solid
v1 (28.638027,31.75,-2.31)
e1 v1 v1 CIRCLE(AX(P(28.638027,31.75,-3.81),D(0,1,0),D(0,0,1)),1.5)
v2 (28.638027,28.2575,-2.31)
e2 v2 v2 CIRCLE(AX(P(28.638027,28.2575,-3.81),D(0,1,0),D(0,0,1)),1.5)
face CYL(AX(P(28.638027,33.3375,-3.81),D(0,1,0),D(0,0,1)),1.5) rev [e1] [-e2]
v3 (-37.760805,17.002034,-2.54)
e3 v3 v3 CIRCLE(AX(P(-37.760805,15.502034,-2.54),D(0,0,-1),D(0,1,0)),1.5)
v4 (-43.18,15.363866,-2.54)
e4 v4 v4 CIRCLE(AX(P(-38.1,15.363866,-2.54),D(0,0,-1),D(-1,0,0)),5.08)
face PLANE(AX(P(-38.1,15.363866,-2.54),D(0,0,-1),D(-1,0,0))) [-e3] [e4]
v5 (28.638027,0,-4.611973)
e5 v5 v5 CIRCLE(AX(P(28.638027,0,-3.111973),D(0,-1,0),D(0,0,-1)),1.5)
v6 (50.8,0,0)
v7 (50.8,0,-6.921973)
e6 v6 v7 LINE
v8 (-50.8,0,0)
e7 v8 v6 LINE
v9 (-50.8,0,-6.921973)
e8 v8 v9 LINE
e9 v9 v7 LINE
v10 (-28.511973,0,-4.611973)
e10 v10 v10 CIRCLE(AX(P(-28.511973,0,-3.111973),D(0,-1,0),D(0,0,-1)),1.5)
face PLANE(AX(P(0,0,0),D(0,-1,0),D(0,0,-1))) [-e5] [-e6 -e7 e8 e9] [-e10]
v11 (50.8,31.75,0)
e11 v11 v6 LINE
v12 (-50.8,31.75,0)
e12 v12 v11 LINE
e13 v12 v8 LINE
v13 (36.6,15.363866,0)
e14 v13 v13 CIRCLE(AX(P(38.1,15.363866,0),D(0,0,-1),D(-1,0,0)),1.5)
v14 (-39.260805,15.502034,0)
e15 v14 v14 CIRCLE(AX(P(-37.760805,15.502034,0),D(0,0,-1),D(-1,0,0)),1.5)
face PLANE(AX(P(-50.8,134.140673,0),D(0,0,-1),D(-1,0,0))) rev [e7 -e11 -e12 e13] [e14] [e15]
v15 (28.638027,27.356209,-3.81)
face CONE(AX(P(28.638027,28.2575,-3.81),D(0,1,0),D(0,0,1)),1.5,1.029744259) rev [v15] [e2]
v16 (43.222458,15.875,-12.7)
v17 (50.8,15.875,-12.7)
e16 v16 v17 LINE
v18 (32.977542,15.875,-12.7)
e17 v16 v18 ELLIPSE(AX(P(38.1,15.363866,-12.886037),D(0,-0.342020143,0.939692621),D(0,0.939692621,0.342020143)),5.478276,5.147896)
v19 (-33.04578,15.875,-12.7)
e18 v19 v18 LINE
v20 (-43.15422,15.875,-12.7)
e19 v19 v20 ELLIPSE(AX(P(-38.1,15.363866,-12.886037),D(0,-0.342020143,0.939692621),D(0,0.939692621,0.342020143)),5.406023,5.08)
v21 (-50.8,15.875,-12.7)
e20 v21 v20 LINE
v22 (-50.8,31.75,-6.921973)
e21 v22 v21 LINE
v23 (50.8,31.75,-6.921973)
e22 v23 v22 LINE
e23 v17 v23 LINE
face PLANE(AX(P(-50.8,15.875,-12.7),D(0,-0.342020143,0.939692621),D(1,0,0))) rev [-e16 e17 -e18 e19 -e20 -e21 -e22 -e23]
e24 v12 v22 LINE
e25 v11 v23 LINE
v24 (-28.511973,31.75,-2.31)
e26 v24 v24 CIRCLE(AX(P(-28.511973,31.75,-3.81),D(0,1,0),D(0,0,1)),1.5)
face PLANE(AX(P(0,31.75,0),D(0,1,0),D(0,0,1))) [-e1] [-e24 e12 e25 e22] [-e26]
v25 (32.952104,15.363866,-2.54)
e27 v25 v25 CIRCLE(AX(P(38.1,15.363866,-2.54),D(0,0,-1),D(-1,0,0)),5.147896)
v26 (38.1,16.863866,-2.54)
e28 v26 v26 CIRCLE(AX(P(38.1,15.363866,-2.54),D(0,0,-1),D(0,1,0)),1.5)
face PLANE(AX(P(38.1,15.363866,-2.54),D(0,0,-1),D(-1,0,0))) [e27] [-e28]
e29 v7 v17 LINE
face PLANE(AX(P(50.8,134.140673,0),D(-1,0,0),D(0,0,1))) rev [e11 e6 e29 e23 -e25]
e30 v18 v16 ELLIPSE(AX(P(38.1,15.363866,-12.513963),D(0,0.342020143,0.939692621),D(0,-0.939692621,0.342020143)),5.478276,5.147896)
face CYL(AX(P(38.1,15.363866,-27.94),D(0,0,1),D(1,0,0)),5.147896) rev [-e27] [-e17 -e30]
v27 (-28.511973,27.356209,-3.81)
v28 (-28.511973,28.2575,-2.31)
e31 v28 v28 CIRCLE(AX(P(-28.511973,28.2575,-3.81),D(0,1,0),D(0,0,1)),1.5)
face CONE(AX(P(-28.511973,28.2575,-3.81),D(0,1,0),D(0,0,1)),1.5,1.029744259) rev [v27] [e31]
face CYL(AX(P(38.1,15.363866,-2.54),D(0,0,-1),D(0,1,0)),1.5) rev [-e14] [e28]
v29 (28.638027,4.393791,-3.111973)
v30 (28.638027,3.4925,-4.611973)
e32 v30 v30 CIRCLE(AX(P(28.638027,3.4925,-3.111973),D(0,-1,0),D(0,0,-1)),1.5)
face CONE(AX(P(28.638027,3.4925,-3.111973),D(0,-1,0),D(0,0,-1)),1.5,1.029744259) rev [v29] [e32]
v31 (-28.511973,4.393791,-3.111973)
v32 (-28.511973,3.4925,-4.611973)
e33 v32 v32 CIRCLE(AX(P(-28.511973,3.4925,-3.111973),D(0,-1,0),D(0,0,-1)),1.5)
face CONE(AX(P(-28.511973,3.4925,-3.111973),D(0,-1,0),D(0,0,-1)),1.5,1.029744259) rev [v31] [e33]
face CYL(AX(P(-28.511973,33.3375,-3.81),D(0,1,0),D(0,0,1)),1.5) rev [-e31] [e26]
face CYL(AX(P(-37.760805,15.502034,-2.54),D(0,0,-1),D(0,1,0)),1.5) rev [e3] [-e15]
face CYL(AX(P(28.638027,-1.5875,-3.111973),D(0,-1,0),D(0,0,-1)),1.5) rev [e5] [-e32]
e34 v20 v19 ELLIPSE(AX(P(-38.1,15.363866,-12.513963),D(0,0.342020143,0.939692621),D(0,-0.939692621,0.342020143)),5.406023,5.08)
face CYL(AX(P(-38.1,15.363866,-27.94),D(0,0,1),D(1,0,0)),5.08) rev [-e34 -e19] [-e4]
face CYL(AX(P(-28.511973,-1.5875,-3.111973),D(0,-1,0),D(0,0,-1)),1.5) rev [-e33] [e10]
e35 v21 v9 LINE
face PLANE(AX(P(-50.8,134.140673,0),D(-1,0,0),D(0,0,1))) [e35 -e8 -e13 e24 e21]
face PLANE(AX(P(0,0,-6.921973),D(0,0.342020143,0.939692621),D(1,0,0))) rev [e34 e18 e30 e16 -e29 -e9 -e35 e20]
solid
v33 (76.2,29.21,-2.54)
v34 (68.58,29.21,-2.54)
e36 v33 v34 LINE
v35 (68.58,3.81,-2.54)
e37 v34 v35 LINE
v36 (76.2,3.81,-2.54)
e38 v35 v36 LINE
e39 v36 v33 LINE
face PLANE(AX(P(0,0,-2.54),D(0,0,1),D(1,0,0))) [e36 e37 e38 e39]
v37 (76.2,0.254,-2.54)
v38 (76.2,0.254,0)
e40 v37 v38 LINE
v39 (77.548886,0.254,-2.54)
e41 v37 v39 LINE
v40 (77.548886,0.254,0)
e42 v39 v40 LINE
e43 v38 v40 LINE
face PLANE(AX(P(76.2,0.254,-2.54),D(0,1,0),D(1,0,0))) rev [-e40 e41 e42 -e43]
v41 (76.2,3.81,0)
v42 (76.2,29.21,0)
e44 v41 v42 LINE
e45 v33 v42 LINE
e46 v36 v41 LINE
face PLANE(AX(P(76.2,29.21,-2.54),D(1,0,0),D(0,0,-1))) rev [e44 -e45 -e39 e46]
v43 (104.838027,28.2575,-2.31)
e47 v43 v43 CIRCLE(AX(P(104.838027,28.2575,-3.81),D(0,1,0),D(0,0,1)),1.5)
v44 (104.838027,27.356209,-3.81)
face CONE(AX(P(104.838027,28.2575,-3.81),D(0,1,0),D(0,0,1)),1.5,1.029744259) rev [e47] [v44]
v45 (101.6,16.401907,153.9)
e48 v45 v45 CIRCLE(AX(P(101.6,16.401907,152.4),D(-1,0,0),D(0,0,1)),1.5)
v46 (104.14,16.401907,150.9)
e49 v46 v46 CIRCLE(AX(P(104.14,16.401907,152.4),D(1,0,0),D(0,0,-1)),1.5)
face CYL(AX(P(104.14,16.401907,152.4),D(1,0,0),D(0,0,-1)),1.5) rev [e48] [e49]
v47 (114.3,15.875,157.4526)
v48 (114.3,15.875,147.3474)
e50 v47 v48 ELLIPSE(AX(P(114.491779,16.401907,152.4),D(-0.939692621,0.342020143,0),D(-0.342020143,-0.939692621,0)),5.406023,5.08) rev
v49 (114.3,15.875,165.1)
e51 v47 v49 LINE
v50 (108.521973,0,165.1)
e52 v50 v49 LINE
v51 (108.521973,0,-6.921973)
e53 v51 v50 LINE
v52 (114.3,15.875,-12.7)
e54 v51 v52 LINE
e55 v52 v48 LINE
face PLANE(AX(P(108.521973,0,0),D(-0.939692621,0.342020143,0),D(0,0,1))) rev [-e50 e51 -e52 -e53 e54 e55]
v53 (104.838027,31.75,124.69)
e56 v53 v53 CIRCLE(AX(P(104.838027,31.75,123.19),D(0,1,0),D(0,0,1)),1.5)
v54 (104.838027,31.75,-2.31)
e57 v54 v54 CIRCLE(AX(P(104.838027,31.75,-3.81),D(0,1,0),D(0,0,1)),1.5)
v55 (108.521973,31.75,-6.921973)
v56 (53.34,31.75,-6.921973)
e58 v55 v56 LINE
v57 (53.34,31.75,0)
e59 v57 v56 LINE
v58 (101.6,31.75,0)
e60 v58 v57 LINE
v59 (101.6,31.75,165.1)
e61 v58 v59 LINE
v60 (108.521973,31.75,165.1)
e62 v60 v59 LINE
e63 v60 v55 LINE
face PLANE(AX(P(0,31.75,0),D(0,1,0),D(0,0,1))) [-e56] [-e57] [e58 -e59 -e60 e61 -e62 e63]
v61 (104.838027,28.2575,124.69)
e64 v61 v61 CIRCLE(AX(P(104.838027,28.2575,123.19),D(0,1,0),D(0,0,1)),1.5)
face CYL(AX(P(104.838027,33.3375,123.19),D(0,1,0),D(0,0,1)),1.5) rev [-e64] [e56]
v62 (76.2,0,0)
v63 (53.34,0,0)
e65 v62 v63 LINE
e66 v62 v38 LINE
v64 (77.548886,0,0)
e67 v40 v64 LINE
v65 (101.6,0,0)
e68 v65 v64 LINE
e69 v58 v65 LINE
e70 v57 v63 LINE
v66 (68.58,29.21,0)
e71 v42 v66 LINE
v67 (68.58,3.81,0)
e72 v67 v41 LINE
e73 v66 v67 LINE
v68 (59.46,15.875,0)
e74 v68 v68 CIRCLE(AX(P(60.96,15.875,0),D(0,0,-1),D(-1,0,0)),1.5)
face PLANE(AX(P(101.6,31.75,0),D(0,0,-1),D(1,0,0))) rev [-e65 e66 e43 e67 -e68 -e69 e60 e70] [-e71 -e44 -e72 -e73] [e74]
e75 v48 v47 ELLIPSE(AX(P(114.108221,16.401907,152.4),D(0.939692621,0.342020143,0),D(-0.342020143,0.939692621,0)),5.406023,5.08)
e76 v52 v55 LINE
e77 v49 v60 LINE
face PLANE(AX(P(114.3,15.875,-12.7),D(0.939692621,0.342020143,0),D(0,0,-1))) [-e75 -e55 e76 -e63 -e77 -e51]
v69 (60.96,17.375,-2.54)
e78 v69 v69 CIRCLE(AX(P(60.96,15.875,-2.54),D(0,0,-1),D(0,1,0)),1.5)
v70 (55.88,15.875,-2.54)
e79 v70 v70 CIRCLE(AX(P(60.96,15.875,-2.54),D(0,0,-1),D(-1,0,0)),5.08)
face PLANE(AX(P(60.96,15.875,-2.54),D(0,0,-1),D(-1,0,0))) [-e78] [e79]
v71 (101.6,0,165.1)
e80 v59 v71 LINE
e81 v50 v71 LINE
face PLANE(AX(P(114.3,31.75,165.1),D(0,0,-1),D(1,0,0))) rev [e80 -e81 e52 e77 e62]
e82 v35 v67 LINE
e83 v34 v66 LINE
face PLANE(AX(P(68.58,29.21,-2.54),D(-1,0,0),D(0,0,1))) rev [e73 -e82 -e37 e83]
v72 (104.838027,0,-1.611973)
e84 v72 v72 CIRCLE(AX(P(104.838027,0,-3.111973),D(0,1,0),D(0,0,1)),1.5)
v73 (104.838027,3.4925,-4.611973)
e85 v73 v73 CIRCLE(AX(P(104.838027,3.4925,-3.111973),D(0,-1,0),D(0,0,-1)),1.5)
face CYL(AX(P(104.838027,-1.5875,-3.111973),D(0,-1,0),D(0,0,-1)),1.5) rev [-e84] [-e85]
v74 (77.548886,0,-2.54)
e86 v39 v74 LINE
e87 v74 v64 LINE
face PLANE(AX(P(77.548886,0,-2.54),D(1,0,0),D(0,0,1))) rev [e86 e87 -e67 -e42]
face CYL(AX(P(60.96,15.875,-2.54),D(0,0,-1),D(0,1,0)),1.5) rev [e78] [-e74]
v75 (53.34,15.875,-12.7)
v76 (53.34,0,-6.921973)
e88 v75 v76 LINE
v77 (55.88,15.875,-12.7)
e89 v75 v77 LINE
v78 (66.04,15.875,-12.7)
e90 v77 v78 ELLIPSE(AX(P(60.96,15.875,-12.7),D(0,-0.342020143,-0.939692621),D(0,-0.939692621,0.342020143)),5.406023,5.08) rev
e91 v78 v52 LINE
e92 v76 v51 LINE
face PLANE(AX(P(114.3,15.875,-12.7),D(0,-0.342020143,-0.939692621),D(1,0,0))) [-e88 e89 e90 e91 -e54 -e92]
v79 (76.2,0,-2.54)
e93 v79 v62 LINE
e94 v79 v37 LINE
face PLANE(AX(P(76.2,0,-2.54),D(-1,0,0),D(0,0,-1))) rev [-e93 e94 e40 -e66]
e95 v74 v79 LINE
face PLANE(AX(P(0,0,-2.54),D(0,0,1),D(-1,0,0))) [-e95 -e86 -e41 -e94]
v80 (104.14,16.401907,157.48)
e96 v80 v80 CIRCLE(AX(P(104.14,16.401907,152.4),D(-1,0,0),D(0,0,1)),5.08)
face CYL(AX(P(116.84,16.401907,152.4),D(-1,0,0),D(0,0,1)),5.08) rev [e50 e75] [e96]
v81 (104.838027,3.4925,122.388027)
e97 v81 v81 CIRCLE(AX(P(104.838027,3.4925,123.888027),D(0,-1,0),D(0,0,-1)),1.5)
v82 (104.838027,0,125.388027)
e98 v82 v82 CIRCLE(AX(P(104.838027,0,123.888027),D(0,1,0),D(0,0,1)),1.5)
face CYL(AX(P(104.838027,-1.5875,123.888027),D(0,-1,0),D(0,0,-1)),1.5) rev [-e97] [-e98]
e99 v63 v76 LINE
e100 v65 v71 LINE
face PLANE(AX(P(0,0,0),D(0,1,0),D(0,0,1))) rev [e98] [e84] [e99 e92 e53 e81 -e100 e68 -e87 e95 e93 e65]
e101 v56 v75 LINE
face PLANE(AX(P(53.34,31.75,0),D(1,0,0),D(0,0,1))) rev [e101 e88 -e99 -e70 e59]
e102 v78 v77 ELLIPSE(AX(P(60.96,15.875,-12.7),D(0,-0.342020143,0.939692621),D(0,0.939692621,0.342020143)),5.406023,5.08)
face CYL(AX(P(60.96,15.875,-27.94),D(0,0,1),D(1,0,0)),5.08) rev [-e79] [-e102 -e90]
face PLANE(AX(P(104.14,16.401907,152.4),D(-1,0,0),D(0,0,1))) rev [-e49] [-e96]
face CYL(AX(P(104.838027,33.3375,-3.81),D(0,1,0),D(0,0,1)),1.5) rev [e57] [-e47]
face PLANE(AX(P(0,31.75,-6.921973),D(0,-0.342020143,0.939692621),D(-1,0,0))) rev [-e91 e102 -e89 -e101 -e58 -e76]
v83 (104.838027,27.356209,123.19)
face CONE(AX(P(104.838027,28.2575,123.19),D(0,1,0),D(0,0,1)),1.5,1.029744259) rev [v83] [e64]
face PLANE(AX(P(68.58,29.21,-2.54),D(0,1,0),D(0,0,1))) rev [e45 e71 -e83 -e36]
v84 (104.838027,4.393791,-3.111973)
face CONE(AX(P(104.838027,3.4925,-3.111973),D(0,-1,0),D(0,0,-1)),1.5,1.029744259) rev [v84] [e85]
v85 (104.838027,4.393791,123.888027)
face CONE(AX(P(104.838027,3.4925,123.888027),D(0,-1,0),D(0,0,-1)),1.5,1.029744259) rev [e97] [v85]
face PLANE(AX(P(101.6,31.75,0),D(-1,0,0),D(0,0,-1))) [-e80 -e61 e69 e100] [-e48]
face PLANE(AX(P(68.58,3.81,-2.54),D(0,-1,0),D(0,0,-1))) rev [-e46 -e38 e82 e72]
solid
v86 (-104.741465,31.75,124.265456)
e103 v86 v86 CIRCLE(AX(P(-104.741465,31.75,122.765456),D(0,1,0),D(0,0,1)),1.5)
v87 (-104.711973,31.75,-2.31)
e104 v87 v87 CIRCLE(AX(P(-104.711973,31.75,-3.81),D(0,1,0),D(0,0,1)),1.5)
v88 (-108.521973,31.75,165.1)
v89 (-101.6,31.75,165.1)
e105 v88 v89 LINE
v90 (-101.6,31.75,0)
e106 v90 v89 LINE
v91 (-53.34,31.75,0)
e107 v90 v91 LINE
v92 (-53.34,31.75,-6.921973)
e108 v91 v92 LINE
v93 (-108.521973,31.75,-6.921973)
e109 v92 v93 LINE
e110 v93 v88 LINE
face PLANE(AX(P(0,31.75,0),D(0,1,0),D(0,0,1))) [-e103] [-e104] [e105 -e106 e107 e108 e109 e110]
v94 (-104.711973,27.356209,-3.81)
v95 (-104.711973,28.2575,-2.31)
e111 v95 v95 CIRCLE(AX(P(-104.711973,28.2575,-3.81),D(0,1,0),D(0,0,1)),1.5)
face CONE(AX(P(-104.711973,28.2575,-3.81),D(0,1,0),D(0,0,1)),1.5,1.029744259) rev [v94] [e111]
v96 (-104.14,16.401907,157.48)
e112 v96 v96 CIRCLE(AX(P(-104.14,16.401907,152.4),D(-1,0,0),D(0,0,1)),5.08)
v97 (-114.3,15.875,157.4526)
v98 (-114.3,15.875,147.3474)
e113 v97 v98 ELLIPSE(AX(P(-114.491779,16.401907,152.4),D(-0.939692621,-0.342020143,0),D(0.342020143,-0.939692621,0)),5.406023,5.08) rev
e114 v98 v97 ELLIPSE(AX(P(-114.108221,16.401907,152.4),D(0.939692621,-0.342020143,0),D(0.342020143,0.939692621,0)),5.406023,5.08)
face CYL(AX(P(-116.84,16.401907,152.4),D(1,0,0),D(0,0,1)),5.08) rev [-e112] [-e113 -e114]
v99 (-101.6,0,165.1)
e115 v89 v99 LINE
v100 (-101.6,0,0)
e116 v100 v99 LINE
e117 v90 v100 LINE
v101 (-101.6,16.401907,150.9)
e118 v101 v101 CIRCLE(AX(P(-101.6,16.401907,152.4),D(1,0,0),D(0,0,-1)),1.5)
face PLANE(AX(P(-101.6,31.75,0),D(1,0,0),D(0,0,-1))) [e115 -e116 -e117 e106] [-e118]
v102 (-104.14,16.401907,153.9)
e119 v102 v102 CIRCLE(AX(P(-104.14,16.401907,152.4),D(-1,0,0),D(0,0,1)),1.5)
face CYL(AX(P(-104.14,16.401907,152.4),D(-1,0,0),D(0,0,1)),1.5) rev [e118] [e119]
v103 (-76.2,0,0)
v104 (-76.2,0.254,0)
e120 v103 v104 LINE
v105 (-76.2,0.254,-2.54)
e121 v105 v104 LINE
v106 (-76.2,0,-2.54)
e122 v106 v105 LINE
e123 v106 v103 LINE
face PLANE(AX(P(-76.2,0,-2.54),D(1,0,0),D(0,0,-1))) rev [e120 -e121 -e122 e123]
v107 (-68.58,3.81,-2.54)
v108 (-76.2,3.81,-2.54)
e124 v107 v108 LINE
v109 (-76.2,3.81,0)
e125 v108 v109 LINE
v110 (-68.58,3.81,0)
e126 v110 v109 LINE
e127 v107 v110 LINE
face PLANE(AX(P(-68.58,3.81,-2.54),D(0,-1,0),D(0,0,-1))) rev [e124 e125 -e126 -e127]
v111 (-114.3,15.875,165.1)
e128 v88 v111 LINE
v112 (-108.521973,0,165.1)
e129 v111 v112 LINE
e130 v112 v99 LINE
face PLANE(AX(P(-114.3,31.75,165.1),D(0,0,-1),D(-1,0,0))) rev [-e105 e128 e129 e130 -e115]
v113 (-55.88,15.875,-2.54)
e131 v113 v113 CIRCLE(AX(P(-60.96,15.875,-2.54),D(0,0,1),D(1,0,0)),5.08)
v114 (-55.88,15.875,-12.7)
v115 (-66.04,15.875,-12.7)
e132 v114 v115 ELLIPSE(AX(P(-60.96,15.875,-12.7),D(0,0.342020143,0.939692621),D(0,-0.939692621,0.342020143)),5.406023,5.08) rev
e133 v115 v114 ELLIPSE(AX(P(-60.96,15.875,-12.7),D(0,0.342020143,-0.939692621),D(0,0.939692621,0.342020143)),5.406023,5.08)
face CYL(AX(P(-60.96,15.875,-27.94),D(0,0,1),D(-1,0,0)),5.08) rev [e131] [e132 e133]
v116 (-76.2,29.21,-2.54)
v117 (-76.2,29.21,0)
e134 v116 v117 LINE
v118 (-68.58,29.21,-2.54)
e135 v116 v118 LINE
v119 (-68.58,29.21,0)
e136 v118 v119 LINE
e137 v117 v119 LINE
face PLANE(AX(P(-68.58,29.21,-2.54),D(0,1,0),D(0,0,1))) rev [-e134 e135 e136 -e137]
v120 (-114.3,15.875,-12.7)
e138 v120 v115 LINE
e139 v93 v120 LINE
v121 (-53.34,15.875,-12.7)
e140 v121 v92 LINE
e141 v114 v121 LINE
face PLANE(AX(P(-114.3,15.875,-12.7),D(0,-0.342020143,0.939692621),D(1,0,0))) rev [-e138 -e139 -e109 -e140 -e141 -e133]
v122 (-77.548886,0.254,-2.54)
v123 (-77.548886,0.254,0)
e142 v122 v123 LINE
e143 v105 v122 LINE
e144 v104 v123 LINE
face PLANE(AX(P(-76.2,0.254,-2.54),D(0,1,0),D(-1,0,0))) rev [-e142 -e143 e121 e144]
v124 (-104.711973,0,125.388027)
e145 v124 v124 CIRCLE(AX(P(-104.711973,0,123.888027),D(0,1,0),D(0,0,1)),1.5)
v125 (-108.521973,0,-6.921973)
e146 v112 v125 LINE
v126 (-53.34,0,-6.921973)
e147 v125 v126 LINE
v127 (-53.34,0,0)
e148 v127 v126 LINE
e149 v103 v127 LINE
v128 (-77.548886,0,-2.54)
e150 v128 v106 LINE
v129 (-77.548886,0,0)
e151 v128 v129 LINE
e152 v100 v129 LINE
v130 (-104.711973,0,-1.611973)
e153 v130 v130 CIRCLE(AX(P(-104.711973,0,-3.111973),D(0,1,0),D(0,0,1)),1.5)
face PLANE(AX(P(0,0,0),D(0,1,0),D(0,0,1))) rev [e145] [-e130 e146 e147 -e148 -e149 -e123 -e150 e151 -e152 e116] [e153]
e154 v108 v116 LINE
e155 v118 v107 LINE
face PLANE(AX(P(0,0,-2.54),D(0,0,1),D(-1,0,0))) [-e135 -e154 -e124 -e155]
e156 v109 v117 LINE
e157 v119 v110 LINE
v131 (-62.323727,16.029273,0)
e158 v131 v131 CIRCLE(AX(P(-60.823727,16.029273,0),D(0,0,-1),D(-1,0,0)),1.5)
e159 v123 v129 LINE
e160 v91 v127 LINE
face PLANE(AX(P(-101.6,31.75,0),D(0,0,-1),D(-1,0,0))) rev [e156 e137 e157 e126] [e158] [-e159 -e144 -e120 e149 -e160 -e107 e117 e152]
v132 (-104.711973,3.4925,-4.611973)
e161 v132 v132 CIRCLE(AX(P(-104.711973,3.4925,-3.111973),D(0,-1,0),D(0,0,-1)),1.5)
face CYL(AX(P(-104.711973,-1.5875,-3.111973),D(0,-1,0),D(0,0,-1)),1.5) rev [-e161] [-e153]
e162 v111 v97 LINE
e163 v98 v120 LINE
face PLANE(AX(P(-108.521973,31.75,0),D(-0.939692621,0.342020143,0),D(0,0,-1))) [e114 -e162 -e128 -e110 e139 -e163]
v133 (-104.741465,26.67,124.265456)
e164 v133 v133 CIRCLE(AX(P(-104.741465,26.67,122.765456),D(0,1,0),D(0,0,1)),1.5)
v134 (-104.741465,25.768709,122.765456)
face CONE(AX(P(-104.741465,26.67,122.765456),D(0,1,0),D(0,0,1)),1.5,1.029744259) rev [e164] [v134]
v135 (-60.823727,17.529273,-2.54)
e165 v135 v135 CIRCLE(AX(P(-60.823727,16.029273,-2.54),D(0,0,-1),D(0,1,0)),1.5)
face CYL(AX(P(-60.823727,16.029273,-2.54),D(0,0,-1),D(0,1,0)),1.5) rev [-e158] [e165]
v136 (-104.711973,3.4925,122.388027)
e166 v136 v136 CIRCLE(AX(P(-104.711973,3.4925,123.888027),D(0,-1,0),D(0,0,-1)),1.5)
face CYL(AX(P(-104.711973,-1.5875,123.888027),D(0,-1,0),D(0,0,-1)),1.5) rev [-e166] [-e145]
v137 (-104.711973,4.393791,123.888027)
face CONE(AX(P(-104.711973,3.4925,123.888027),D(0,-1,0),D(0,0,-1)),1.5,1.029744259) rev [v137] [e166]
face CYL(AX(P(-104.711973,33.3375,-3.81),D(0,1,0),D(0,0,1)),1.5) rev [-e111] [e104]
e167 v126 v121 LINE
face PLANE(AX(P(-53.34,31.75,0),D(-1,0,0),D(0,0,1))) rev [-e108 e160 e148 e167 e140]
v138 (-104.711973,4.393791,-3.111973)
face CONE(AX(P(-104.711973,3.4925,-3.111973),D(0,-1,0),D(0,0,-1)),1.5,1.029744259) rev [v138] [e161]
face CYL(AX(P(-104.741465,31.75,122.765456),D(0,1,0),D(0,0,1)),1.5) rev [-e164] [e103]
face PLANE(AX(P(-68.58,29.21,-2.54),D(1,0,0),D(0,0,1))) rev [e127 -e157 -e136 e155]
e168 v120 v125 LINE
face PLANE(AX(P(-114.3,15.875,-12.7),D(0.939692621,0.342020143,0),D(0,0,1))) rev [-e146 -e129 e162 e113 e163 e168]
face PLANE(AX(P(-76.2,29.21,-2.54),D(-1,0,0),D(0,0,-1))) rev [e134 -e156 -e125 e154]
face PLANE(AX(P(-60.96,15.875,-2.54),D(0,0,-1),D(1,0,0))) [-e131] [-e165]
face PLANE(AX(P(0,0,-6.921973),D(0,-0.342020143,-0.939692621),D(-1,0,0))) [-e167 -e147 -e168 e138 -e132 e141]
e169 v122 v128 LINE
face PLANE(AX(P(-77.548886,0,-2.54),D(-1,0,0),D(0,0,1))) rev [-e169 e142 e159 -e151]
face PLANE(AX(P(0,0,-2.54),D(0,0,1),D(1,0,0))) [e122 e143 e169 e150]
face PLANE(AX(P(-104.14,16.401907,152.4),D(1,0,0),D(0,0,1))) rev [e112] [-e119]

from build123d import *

# Parameters (mm, degrees)
BOSS_EXTRUDE1_DEPTH            = 31.75
SKETCH2_W                      = 1.348886442
SKETCH2_H                      = 0.254
CUT_EXTRUDE1_DEPTH             = 2.54
SKETCH19_W                     = 7.62
SKETCH19_H                     = 25.4
CUT_EXTRUDE5_DEPTH             = 2.54
SKETCH3_W                      = 101.6
SKETCH3_H                      = 12.7
BOSS_EXTRUDE2_DEPTH            = 31.75
CHAMFER4_SIZE                  = 15.875
CHAMFER4_SIZE2                 = 5.778027469
CHAMFER5_SIZE                  = 15.875
CHAMFER5_SIZE_2                = 5.778027469
CHAMFER6_SIZE                  = 15.875
CHAMFER6_SIZE2                 = 5.778027469
CHAMFER7_SIZE                  = 15.875
CHAMFER7_SIZE_2                = 5.778027469
CHAMFER8_SIZE                  = 15.875
CHAMFER8_SIZE2                 = 5.778027469
CHAMFER9_SIZE                  = 15.875
CHAMFER9_SIZE_2                = 5.778027469
CHAMFER10_SIZE                 = 15.875
CHAMFER10_SIZE2                = 5.778027469
CHAMFER11_SIZE2                = 5.778027469
CHAMFER11_SIZE                 = 15.875
CHAMFER12_SIZE                 = 15.875
CHAMFER12_SIZE2                = 5.778027469
CHAMFER13_SIZE2                = 5.778027469
CHAMFER13_SIZE                 = 15.875
CUT_EXTRUDE2_START             = 2.54
SKETCH4_R                      = 5.08
CUT_EXTRUDE2_DEPTH             = 25.4
CUT_EXTRUDE3_START             = 2.54
SKETCH5_R                      = 5.147895679
SKETCH5_R_2                    = 5.08
CUT_EXTRUDE3_DEPTH             = 25.4
CUT_EXTRUDE4_START             = -2.54
SKETCH6_R                      = 5.08
CUT_EXTRUDE4_DEPTH             = 12.7
F_3_0MM_DOWEL_HOLE3_AT_2_COUNT = 2
F_3_0MM_DOWEL_HOLE3_AT_2_PITCH = 23.068947374
F_3_0MM_START                  = -2.54
F_3_0MM_DOWEL_HOLE4_OUTLINE_R  = 1.5
F_3_0MM_DOWEL_HOLE4_DEPTH      = 2.54


# Read off the part's stored shape, not the designer's step: Ø3.0mm Dowel Hole4, Ø3.0mm Dowel Hole5, Ø3.0mm Dowel Hole6
# Some blends are built 0.0001 mm under size
with BuildPart() as part:
    # Sketch1 → Boss-Extrude1 (new body)
    with BuildSketch(Plane(origin=(0, 0, 0), x_dir=(1, 0, 0), z_dir=(0, 1, 0))):
        Polygon((-101.6, 0), (-101.6, -165.1), (-114.3, -165.1), (-114.3, 12.7), (-53.34, 12.7), (-53.34, 0), align=None)
    extrude(amount=BOSS_EXTRUDE1_DEPTH)

    # Sketch2 → Cut-Extrude1 (cut)
    with BuildSketch(Plane.XY):
        with Locations((-76.874443221, 0.127)):
            Rectangle(SKETCH2_W, SKETCH2_H)
    extrude(amount=-CUT_EXTRUDE1_DEPTH, mode=Mode.SUBTRACT)


with BuildPart() as body_2:
    # Mirror4: mirrored copy
    add(part.part.mirror(Plane(origin=(0, 0, 0), x_dir=(0, 0, 1), z_dir=(1, 0, 0))))

    # Sketch19 → Cut-Extrude5 (cut)
    with BuildSketch(Plane.XY):
        with Locations((72.39, 16.51)):
            Rectangle(SKETCH19_W, SKETCH19_H)
    cut_extrude5 = extrude(amount=-CUT_EXTRUDE5_DEPTH, mode=Mode.SUBTRACT)

    # Chamfer8
    chamfer8_edges = [body_2.edges().sort_by_distance(p)[0] for p in [
        (114.3, 31.75, 76.2),
    ]]
    chamfer8_side = [body_2.faces().sort_by_distance(p)[0] for p in [
        (114.3, 15.875, 76.2),
    ]]
    chamfer(chamfer8_edges, length=CHAMFER8_SIZE, length2=CHAMFER8_SIZE2, reference=chamfer8_side[0])

    # Chamfer9
    # the kernel refuses this chamfer: 15.875, 5.778027469 mm, written as the material it takes off along each edge
    with BuildSketch(Plane(origin=(114.3, 0, 206.282841379), x_dir=(0.013184058198645545, 0.9999130865277317, 0), z_dir=(0, 0, -1))) as chamfer9_piece_1:
        Polygon((CHAMFER9_SIZE * 0.999913086528, -CHAMFER9_SIZE * 0.0131840581986), (-CHAMFER9_SIZE_2 * 0.0131840581986, -CHAMFER9_SIZE_2 * 0.999913086524), (0, 0), align=None)
    extrude(amount=260.165682758, mode=Mode.SUBTRACT)

    # Chamfer10
    chamfer10_edges = [body_2.edges().sort_by_distance(p)[0] for p in [
        (80.930986266, 31.75, -12.7),
    ]]
    chamfer10_side = [body_2.faces().sort_by_distance(p)[0] for p in [
        (82.399447724, 15.875, -12.7),
    ]]
    chamfer(chamfer10_edges, length=CHAMFER10_SIZE, length2=CHAMFER10_SIZE2, reference=chamfer10_side[0])

    # Chamfer11
    chamfer11_edges = [body_2.edges().sort_by_distance(p)[0] for p in [
        (80.930986266, 0, -12.7),
    ]]
    chamfer11_side = [body_2.faces().sort_by_distance(p)[0] for p in [
        (80.930986266, 0.115560549, -12.7),
    ]]
    chamfer(chamfer11_edges, length=CHAMFER11_SIZE - 0.0001, length2=CHAMFER11_SIZE2 - 0.0001, reference=chamfer11_side[0])  # a hair under: the kernel refuses the full size

    # Sketch4 → Cut-Extrude2 (cut)
    with BuildSketch(Plane(origin=(-76.2, 0, 0), x_dir=(-1, 0, 0), z_dir=(0, 0, -1)).offset(CUT_EXTRUDE2_START)):
        with Locations((-137.16, 15.875)):
            Circle(SKETCH4_R)
    cut_extrude2 = extrude(amount=CUT_EXTRUDE2_DEPTH, mode=Mode.SUBTRACT)

    # Sketch6 → Cut-Extrude4 (cut)
    with BuildSketch(Plane.ZY.offset(-101.6).offset(CUT_EXTRUDE4_START)):
        with Locations((152.4, 16.401907221)):
            Circle(SKETCH6_R)
    cut_extrude4 = extrude(amount=-CUT_EXTRUDE4_DEPTH, mode=Mode.SUBTRACT)

    # Sketch8 → Hole Wizard 2736 (revolve, cut)
    with BuildSketch(Plane(origin=(104.14, 16.401907221, 152.4), x_dir=(0, 0, -1), z_dir=(0, 1, 0))):
        Polygon((0, 0), (0, 8.521290929), (1.5, 7.62), (1.5, 0), align=None)
    revolve(axis=Axis((110.49, 16.401907221, 152.4), (-1, 0, 0)), mode=Mode.SUBTRACT)

    # Sketch12 → Ø3.0mm Dowel Hole1 (revolve, cut)
    with BuildSketch(Plane(origin=(60.96, 15.875, -2.54), x_dir=(0, 1, 0), z_dir=(1, 0, 0))):
        Polygon((0, 0), (0, 5.981290929), (1.5, 5.08), (1.5, 0), align=None)
    revolve(axis=Axis((60.96, 15.875, -8.89), (0, 0, 1)), mode=Mode.SUBTRACT)

    # 3.0mm Dowel Hole5 3 outline → 3.0mm Dowel Hole5 3 (revolve, cut)
    with BuildSketch(Plane(origin=(104.838027469, 0, -3.81), x_dir=(1, 0, 0), z_dir=(0, 0, 1))):
        Polygon((0, 31.75), (0, 27.356209071), (1.5, 28.2575), (1.5, 31.75), align=None)
    revolve(axis=Axis((104.838027469, 0, -3.81), (0, 1, 0)), mode=Mode.SUBTRACT)

    # 3.0mm Dowel Hole5 4 outline → 3.0mm Dowel Hole5 4 (revolve, cut)
    with BuildSketch(Plane(origin=(104.838027469, 0, 123.19), x_dir=(1, 0, 0), z_dir=(0, 0, 1))):
        Polygon((0, 31.75), (0, 27.356209071), (1.5, 28.2575), (1.5, 31.75), align=None)
    revolve(axis=Axis((104.838027469, 0, 123.19), (0, 1, 0)), mode=Mode.SUBTRACT)

    # 3.0mm Dowel Hole6 3 outline → 3.0mm Dowel Hole6 3 (revolve, cut)
    with BuildSketch(Plane(origin=(104.838027469, 0, -3.111972531), x_dir=(1, 0, 0), z_dir=(0, 0, 1))):
        Polygon((1.5, 0), (1.5, 3.4925), (0, 4.393790929), (0, 0), align=None)
    revolve(axis=Axis((104.838027469, 0, -3.111972531), (0, 1, 0)), mode=Mode.SUBTRACT)

    # 3.0mm Dowel Hole6 4 outline → 3.0mm Dowel Hole6 4 (revolve, cut)
    with BuildSketch(Plane(origin=(104.838027469, 0, 123.888027469), x_dir=(1, 0, 0), z_dir=(0, 0, 1))):
        Polygon((1.5, 0), (1.5, 3.4925), (0, 4.393790929), (0, 0), align=None)
    revolve(axis=Axis((104.838027469, 0, 123.888027469), (0, 1, 0)), mode=Mode.SUBTRACT)


with BuildPart() as body_3:
    # Sketch3 → Boss-Extrude2 (new body)
    with BuildSketch(Plane(origin=(0, 0, 0), x_dir=(1, 0, 0), z_dir=(0, 1, 0))):
        with Locations((0, 6.35)):
            Rectangle(SKETCH3_W, SKETCH3_H)
    extrude(amount=BOSS_EXTRUDE2_DEPTH)

    # Chamfer4
    chamfer4_edges = [body_3.edges().sort_by_distance(p)[0] for p in [
        (0, 31.75, -12.7),
    ]]
    chamfer4_side = [body_3.faces().sort_by_distance(p)[0] for p in [
        (0, 15.875, -12.7),
    ]]
    chamfer(chamfer4_edges, length=CHAMFER4_SIZE, length2=CHAMFER4_SIZE2, reference=chamfer4_side[0])

    # Chamfer5
    # the kernel refuses this chamfer: 15.875, 5.778027469 mm, written as the material it takes off along each edge
    with BuildSketch(Plane(origin=(91.982841379, 0, -12.7), x_dir=(0, 0.9999130865277315, -0.013184058198645866), z_dir=(-1, 0, 0))) as chamfer5_piece_1:
        Polygon((CHAMFER5_SIZE * 0.999913086528, -CHAMFER5_SIZE * 0.0131840581986), (-CHAMFER5_SIZE_2 * 0.0131840581986, -CHAMFER5_SIZE_2 * 0.999913086524), (0, 0), align=None)
    extrude(amount=183.965682758, mode=Mode.SUBTRACT)

    # Sketch5 → Cut-Extrude3 (cut)
    with BuildSketch(Plane(origin=(-76.2, 0, 0), x_dir=(-1, 0, 0), z_dir=(0, 0, -1)).offset(CUT_EXTRUDE3_START)):
        with Locations(Location((-114.3, 15.363866424, 0), (0, 0, 174.301724033))):
            Circle(SKETCH5_R)
        with Locations(Location((-38.1, 15.363866424, 0), (0, 0, 174.225307714))):
            Circle(SKETCH5_R_2)
    extrude(amount=CUT_EXTRUDE3_DEPTH, mode=Mode.SUBTRACT)

    # Sketch15 → Ø3.0mm Dowel Hole3 (revolve, cut)
    with BuildSketch(Plane(origin=(-37.760805084, 15.502033877, -2.54), x_dir=(0, 1, 0), z_dir=(1, 0, 0))):
        Polygon((0, 0), (0, 13.601290929), (1.5, 12.7), (1.5, 0), align=None)
    f_3_0mm_dowel_hole3 = revolve(axis=Axis((-37.760805084, 15.502033877, -8.89), (0, 0, 1)), mode=Mode.SUBTRACT)

    # Ø3.0mm Dowel Hole4 outline → Ø3.0mm Dowel Hole4 (cut)
    with BuildSketch(Plane.XY.offset(F_3_0MM_START)):
        with Locations((38.1, 15.363866424)):
            Circle(F_3_0MM_DOWEL_HOLE4_OUTLINE_R)
    extrude(amount=F_3_0MM_DOWEL_HOLE4_DEPTH, mode=Mode.SUBTRACT)

    # Ø3.0mm Dowel Hole5 outline → Ø3.0mm Dowel Hole5 (revolve, cut)
    with BuildSketch(Plane(origin=(-28.511972531, 0, -3.81), x_dir=(1, 0, 0), z_dir=(0, 0, 1))):
        Polygon((0, 31.75), (0, 27.356209071), (1.5, 28.2575), (1.5, 31.75), align=None)
    revolve(axis=Axis((-28.511972531, 0, -3.81), (0, 1, 0)), mode=Mode.SUBTRACT)

    # 3.0mm Dowel Hole5 2 outline → 3.0mm Dowel Hole5 2 (revolve, cut)
    with BuildSketch(Plane(origin=(28.638027469, 0, -3.81), x_dir=(1, 0, 0), z_dir=(0, 0, 1))):
        Polygon((0, 31.75), (0, 27.356209071), (1.5, 28.2575), (1.5, 31.75), align=None)
    revolve(axis=Axis((28.638027469, 0, -3.81), (0, 1, 0)), mode=Mode.SUBTRACT)

    # Ø3.0mm Dowel Hole6 outline → Ø3.0mm Dowel Hole6 (revolve, cut)
    with BuildSketch(Plane(origin=(28.638027469, 0, -3.111972531), x_dir=(1, 0, 0), z_dir=(0, 0, 1))):
        Polygon((1.5, 3.4925), (0, 4.393790929), (0, 0), (1.5, 0), align=None)
    revolve(axis=Axis((28.638027469, 0, -3.111972531), (0, 1, 0)), mode=Mode.SUBTRACT)

    # 3.0mm Dowel Hole6 2 outline → 3.0mm Dowel Hole6 2 (revolve, cut)
    with BuildSketch(Plane(origin=(-28.511972531, 0, -3.111972531), x_dir=(1, 0, 0), z_dir=(0, 0, 1))):
        Polygon((1.5, 3.4925), (0, 4.393790929), (0, 0), (1.5, 0), align=None)
    revolve(axis=Axis((-28.511972531, 0, -3.111972531), (0, 1, 0)), mode=Mode.SUBTRACT)


with BuildPart() as part_1:
    add(part.part)

    # Chamfer6
    chamfer6_edges = [part_1.edges().sort_by_distance(p)[0] for p in [
        (-114.3, 31.75, 76.2),
    ]]
    chamfer6_side = [part_1.faces().sort_by_distance(p)[0] for p in [
        (-114.3, 15.875, 76.2),
    ]]
    chamfer(chamfer6_edges, length=CHAMFER6_SIZE, length2=CHAMFER6_SIZE2, reference=chamfer6_side[0])

    # Chamfer7
    # the kernel refuses this chamfer: 15.875, 5.778027469 mm, written as the material it takes off along each edge
    with BuildSketch(Plane(origin=(-114.3, 0, 206.282841379), x_dir=(-0.013184058198645545, 0.9999130865277317, 0), z_dir=(0, 0, -1))) as chamfer7_piece_1:
        Polygon((CHAMFER7_SIZE * 0.999913086528, CHAMFER7_SIZE * 0.0131840581986), (-CHAMFER7_SIZE_2 * 0.0131840581986, CHAMFER7_SIZE_2 * 0.999913086524), (0, 0), align=None)
    extrude(amount=260.165682758, mode=Mode.SUBTRACT)

    # Chamfer12
    chamfer12_edges = [part_1.edges().sort_by_distance(p)[0] for p in [
        (-80.930986266, 31.75, -12.7),
    ]]
    chamfer12_side = [part_1.faces().sort_by_distance(p)[0] for p in [
        (-82.399447724, 15.875, -12.7),
    ]]
    chamfer(chamfer12_edges, length=CHAMFER12_SIZE, length2=CHAMFER12_SIZE2, reference=chamfer12_side[0])

    # Chamfer13
    chamfer13_edges = [part_1.edges().sort_by_distance(p)[0] for p in [
        (-80.930986266, 0, -12.7),
    ]]
    chamfer13_side = [part_1.faces().sort_by_distance(p)[0] for p in [
        (-80.930986266, 0.115560549, -12.7),
    ]]
    chamfer(chamfer13_edges, length=CHAMFER13_SIZE - 0.0001, length2=CHAMFER13_SIZE2 - 0.0001, reference=chamfer13_side[0])  # a hair under: the kernel refuses the full size

    # Mirror5: Cut-Extrude2 across plane
    add(cut_extrude2.mirror(Plane(origin=(0, 0, 0), x_dir=(0, 0, 1), z_dir=(1, 0, 0))), mode=Mode.SUBTRACT)

    # Mirror7: Cut-Extrude4 across plane
    add(cut_extrude4.mirror(Plane(origin=(0, 0, 0), x_dir=(0, 0, 1), z_dir=(1, 0, 0))), mode=Mode.SUBTRACT)

    # Sketch10 → Hole Wizard 2871 (revolve, cut)
    with BuildSketch(Plane(origin=(-104.14, 16.401907221, 152.4), x_dir=(0, 0, 1), z_dir=(0, 1, 0))):
        Polygon((0, 0), (0, 8.521290929), (1.5, 7.62), (1.5, 0), align=None)
    revolve(axis=Axis((-110.49, 16.401907221, 152.4), (1, 0, 0)), mode=Mode.SUBTRACT)

    # Ø3.0mm Dowel Hole3 at 2: Ø3.0mm Dowel Hole3 ×2
    with Locations(*[Vector(-0.9997387915498553, 0.022854948489000708, 0) * (i * F_3_0MM_DOWEL_HOLE3_AT_2_PITCH) for i in range(1, F_3_0MM_DOWEL_HOLE3_AT_2_COUNT)]):
        add(f_3_0mm_dowel_hole3, mode=Mode.SUBTRACT)

    # 3.0mm Dowel Hole5 5 outline → 3.0mm Dowel Hole5 5 (revolve, cut)
    with BuildSketch(Plane(origin=(-104.741464941, 0, 122.765456434), x_dir=(1, 0, 0), z_dir=(0, 0, 1))):
        Polygon((0, 31.75), (0, 25.768709071), (1.5, 26.67), (1.5, 31.75), align=None)
    revolve(axis=Axis((-104.741464941, 0, 122.765456434), (0, 1, 0)), mode=Mode.SUBTRACT)

    # 3.0mm Dowel Hole5 6 outline → 3.0mm Dowel Hole5 6 (revolve, cut)
    with BuildSketch(Plane(origin=(-104.711972531, 0, -3.81), x_dir=(1, 0, 0), z_dir=(0, 0, 1))):
        Polygon((0, 31.75), (0, 27.356209071), (1.5, 28.2575), (1.5, 31.75), align=None)
    revolve(axis=Axis((-104.711972531, 0, -3.81), (0, 1, 0)), mode=Mode.SUBTRACT)

    # 3.0mm Dowel Hole6 5 outline → 3.0mm Dowel Hole6 5 (revolve, cut)
    with BuildSketch(Plane(origin=(-104.711972531, 0, -3.111972531), x_dir=(1, 0, 0), z_dir=(0, 0, 1))):
        Polygon((1.5, 0), (1.5, 3.4925), (0, 4.393790929), (0, 0), align=None)
    revolve(axis=Axis((-104.711972531, 0, -3.111972531), (0, 1, 0)), mode=Mode.SUBTRACT)

    # 3.0mm Dowel Hole6 6 outline → 3.0mm Dowel Hole6 6 (revolve, cut)
    with BuildSketch(Plane(origin=(-104.711972531, 0, 123.888027469), x_dir=(1, 0, 0), z_dir=(0, 0, 1))):
        Polygon((1.5, 0), (1.5, 3.4925), (0, 4.393790929), (0, 0), align=None)
    revolve(axis=Axis((-104.711972531, 0, 123.888027469), (0, 1, 0)), mode=Mode.SUBTRACT)

    # Mirror8: Cut-Extrude5 across plane
    add(cut_extrude5.mirror(Plane(origin=(0, 0, 0), x_dir=(0, 0, 1), z_dir=(1, 0, 0))), mode=Mode.SUBTRACT)


solid = Compound([body_2.part, body_3.part, part_1.part])
